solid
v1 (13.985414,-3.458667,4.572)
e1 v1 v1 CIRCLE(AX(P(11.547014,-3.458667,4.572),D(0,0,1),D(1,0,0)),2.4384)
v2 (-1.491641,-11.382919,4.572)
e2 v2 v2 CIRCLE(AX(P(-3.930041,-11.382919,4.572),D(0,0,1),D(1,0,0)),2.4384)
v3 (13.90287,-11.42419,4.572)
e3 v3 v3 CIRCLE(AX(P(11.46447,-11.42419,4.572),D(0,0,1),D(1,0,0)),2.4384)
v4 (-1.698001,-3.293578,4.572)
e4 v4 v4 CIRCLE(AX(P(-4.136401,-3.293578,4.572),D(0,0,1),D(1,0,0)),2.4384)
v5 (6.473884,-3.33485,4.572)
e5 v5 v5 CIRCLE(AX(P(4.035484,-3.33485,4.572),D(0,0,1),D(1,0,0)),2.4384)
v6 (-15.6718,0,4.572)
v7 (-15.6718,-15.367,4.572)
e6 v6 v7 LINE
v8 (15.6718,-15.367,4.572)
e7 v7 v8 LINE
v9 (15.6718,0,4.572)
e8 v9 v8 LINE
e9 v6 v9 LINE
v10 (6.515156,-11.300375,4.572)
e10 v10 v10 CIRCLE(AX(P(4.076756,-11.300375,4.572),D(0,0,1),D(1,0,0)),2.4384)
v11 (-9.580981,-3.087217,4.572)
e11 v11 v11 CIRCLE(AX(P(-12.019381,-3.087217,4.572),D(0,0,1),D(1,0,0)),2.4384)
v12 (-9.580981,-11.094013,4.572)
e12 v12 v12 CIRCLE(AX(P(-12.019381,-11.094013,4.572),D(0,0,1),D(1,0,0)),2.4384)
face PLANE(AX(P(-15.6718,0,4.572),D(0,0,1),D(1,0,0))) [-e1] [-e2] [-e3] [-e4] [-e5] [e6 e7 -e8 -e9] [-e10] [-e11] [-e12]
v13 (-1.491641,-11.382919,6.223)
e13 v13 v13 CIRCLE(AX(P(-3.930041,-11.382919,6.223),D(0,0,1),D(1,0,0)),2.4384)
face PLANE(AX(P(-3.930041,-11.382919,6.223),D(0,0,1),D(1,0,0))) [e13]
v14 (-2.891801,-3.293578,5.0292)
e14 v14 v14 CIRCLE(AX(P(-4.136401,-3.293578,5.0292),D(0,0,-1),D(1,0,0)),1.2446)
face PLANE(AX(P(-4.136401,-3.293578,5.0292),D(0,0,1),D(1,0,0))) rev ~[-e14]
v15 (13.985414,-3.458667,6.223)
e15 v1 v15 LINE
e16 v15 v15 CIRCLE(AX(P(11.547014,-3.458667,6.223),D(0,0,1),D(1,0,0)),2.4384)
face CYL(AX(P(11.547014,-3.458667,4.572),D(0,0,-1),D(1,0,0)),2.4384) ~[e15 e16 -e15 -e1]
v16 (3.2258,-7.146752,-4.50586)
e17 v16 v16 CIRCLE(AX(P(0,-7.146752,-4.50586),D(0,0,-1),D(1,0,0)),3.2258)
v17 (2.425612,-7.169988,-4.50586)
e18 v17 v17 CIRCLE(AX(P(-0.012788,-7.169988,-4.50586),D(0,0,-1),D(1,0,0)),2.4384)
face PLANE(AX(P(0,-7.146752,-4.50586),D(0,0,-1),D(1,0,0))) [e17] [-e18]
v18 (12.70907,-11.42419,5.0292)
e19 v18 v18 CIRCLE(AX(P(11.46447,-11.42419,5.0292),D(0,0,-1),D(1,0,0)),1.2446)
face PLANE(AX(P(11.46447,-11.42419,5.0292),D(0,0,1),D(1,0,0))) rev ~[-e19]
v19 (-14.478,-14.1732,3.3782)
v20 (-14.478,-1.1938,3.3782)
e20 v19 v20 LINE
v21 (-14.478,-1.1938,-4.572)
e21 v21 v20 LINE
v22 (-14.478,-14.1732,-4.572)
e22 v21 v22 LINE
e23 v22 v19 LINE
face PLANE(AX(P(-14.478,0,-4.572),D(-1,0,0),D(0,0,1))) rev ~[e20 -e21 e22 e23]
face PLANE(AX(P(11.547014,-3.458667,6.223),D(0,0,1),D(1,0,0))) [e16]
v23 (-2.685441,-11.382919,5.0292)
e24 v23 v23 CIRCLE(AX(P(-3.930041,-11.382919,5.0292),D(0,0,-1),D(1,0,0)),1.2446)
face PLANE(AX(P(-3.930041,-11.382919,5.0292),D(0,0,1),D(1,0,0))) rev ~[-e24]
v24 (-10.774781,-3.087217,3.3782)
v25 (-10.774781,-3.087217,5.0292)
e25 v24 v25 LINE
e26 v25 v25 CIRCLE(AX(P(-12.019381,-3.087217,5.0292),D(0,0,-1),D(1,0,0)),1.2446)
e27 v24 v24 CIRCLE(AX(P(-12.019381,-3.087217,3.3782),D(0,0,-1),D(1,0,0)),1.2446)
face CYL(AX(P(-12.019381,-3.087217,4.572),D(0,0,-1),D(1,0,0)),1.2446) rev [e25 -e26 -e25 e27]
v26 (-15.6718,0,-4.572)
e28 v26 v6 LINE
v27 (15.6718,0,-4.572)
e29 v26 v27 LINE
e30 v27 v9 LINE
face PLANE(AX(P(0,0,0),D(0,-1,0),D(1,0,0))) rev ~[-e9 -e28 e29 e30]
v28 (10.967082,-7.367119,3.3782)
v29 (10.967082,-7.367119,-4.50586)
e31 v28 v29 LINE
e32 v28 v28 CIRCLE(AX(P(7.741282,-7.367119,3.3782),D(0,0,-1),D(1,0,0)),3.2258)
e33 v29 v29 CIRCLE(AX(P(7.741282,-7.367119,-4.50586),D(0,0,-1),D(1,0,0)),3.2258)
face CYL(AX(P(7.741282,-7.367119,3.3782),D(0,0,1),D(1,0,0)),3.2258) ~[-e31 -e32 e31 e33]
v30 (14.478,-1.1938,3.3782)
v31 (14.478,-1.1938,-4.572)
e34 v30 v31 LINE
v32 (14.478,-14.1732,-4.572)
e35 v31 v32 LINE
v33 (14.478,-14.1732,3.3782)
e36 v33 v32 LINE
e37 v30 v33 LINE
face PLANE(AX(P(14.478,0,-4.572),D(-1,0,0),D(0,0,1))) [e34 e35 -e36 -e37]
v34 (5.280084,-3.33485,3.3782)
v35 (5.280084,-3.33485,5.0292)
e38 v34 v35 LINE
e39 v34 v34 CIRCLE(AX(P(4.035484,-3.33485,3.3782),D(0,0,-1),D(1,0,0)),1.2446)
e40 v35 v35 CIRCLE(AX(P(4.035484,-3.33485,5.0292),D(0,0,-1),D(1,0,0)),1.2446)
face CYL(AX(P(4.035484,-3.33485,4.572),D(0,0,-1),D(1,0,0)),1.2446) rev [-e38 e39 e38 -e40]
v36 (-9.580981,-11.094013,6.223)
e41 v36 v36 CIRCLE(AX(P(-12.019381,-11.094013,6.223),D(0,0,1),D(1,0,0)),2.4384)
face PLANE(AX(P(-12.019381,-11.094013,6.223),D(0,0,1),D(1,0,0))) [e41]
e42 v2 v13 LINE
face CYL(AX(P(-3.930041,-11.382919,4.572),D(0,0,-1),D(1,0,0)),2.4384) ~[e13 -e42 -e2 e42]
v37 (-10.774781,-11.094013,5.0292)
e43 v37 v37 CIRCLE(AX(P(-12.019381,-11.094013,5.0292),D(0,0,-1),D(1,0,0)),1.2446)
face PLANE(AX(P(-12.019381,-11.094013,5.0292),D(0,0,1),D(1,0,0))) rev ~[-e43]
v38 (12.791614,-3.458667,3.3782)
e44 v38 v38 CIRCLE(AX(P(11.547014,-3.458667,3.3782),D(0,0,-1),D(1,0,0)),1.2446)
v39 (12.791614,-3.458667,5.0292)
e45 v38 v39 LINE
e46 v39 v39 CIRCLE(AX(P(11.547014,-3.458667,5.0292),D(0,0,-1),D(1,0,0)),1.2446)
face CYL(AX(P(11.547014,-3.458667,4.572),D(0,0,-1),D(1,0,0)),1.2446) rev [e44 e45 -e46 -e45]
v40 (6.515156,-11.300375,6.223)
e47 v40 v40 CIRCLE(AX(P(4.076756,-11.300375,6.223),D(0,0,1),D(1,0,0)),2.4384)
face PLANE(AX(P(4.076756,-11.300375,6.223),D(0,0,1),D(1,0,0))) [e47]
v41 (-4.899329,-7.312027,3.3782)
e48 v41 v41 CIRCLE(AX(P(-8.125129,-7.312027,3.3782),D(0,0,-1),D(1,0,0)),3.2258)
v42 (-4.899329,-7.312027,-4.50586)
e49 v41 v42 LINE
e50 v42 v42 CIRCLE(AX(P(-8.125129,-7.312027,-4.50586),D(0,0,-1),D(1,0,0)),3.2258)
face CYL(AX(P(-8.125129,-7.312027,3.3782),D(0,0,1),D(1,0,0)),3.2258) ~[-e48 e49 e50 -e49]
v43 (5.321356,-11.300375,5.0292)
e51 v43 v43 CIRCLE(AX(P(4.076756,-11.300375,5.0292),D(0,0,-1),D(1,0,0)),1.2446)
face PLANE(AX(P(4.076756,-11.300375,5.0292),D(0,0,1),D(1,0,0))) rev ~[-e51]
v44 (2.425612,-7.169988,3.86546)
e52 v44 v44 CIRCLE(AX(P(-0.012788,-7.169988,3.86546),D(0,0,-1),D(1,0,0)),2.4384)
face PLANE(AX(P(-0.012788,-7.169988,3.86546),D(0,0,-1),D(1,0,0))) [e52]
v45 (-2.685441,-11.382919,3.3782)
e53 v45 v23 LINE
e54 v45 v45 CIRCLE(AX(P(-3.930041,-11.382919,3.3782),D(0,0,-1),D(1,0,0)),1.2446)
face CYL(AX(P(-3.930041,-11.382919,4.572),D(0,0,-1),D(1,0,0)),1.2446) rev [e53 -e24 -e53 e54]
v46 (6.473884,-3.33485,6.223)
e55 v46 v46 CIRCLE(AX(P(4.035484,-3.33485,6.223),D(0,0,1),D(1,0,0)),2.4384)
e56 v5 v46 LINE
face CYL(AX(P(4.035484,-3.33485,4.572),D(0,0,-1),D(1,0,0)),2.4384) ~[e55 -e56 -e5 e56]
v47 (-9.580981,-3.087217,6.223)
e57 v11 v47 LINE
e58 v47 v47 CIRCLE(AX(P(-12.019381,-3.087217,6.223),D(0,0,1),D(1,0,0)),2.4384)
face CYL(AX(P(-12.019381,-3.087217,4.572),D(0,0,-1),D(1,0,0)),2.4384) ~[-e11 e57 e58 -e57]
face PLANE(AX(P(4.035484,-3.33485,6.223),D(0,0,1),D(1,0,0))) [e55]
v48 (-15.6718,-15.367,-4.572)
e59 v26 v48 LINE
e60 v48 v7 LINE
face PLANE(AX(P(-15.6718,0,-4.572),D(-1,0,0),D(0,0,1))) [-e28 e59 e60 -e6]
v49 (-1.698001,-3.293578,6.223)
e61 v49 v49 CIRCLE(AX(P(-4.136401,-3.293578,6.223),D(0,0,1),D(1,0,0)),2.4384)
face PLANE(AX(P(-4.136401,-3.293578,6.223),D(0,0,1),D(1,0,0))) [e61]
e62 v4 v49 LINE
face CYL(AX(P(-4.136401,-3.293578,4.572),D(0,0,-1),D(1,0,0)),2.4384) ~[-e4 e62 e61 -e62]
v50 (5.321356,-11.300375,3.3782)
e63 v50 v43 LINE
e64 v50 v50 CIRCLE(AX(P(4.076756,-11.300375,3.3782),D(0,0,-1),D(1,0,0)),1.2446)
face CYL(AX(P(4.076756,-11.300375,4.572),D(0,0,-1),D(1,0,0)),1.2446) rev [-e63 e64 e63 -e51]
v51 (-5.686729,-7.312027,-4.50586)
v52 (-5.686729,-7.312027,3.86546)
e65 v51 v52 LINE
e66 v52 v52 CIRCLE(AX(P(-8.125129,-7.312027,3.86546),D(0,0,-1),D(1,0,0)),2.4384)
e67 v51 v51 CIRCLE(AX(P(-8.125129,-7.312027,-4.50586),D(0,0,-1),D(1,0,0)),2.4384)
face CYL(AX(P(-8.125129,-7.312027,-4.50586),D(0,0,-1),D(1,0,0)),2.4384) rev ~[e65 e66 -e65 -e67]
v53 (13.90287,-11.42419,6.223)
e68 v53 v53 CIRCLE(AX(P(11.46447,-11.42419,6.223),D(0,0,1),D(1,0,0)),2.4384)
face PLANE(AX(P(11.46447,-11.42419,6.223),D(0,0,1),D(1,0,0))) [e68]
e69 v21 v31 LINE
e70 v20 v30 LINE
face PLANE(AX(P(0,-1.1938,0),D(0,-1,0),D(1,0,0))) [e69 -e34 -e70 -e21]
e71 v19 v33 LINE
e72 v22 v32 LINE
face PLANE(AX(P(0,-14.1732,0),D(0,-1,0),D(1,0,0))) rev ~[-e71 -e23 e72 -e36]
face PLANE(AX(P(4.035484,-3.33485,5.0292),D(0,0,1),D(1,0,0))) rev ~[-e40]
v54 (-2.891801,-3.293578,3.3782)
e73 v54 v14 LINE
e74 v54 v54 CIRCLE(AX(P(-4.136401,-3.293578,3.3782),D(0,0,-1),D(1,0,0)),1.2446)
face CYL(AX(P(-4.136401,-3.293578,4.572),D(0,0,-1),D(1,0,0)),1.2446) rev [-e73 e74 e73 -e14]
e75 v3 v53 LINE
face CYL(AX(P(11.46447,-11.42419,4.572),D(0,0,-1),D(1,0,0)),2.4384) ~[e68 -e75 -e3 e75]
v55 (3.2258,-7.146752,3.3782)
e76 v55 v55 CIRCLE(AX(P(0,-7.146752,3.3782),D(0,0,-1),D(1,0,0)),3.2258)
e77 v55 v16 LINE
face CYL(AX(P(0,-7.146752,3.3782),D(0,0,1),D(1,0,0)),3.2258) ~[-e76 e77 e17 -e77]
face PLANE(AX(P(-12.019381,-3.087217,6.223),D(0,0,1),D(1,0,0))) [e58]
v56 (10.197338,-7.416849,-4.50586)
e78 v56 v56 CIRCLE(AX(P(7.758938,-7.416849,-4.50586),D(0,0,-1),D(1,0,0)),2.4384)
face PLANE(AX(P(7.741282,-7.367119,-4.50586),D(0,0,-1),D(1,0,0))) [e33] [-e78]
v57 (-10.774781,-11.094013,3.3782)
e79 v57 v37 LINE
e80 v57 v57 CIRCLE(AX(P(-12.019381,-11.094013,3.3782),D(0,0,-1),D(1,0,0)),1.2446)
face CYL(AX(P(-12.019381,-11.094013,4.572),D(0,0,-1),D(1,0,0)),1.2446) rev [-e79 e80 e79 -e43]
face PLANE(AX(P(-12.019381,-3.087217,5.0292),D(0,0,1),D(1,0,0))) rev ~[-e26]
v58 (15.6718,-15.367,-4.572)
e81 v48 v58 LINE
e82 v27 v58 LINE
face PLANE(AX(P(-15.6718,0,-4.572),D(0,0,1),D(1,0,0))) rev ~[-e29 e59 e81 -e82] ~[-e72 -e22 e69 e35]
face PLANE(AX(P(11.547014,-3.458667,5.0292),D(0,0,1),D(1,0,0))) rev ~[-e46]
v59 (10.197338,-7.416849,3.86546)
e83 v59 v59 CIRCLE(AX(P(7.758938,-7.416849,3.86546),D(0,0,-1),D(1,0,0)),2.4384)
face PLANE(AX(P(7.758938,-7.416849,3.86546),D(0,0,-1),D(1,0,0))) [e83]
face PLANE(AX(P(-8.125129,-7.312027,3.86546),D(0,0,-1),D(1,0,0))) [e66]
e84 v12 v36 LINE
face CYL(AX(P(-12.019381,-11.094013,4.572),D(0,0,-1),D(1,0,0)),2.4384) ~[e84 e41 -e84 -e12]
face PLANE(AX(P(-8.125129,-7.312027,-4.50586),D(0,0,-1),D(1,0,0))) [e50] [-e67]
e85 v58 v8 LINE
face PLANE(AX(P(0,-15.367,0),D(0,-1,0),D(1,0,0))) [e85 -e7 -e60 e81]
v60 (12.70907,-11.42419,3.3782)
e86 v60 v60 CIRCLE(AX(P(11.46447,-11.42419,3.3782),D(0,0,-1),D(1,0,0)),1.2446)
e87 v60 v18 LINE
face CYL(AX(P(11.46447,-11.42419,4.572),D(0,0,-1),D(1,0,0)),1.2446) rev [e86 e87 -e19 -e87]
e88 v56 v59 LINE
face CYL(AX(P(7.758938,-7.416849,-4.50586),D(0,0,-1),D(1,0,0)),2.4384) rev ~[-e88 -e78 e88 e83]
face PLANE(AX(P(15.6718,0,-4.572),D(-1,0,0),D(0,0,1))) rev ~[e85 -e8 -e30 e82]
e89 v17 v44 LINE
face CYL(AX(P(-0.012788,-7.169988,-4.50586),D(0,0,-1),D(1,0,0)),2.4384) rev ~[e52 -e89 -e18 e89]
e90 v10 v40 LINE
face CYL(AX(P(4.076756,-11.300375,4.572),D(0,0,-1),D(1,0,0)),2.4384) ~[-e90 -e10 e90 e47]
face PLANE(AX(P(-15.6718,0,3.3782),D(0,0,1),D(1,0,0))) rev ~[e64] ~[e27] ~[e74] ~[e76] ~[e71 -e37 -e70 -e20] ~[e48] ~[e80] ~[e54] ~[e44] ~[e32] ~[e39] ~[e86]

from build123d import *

# Parameters (mm, degrees)
F0_W     = 31.3436
F0_H     = 9.144
F1_DEPTH = 15.367
F2_R     = 2.4384
F3_DEPTH = 1.651
F4_T     = -1.1938
F5_R     = 3.2258
F6_DEPTH = 7.88406
F7_R     = 2.4384
F8_DEPTH = 8.37132


# Not quite as in the source:
# - the program builds the solid bodies; features that only make, move or delete a surface that nothing else refers to are left out


with BuildPart() as f1:
    # F0 (on Front) → F1 (new body)
    with BuildSketch(Plane.XZ):
        Rectangle(F0_W, F0_H)
    extrude(amount=F1_DEPTH)

    # F2 (on face) → F3 (join)
    with BuildSketch(Plane.XY.offset(4.572)):
        with Locations((-12.0193809271, -3.087217221)):
            Circle(F2_R)
        with Locations((-4.1364012286, -3.2935778145)):
            Circle(F2_R)
        with Locations((4.0354835801, -3.33484984)):
            Circle(F2_R)
        with Locations((11.5470141172, -3.4586666152)):
            Circle(F2_R)
        with Locations((11.4644700661, -11.4241903648)):
            Circle(F2_R)
        with Locations((4.0767556056, -11.3003747538)):
            Circle(F2_R)
        with Locations((-3.9300406352, -11.3829188049)):
            Circle(F2_R)
        with Locations((-12.0193809271, -11.094013229)):
            Circle(F2_R)
    extrude(amount=F3_DEPTH)

    # F4
    f4_openings = [f1.faces().sort_by_distance(p)[0] for p in [
        (0, -7.6835, -4.572),
    ]]
    offset(amount=F4_T, openings=f4_openings, kind=Kind.INTERSECTION)

    # F5 (on face) → F6 (join)
    with BuildSketch(Plane(origin=(0, 0, 3.3782), x_dir=(1, 0, 0), z_dir=(0, 0, -1))):
        with Locations((-8.1251291558, 7.3120272718)):
            Circle(F5_R)
        with Locations((0, 7.1467519738)):
            Circle(F5_R)
        with Locations((7.7412822284, 7.3671187274)):
            Circle(F5_R)
    extrude(amount=F6_DEPTH)

    # F7 (on face) → F8 (cut)
    with BuildSketch(Plane(origin=(0, 0, -4.50586), x_dir=(1, 0, 0), z_dir=(0, 0, -1))):
        with Locations((-8.1251291558, 7.3120272718)):
            Circle(F7_R)
        with Locations((-0.012788114, 7.1699875407)):
            Circle(F7_R)
        with Locations((7.7589382418, 7.4168494903)):
            Circle(F7_R)
    extrude(amount=-F8_DEPTH, mode=Mode.SUBTRACT)


solid = f1.part
